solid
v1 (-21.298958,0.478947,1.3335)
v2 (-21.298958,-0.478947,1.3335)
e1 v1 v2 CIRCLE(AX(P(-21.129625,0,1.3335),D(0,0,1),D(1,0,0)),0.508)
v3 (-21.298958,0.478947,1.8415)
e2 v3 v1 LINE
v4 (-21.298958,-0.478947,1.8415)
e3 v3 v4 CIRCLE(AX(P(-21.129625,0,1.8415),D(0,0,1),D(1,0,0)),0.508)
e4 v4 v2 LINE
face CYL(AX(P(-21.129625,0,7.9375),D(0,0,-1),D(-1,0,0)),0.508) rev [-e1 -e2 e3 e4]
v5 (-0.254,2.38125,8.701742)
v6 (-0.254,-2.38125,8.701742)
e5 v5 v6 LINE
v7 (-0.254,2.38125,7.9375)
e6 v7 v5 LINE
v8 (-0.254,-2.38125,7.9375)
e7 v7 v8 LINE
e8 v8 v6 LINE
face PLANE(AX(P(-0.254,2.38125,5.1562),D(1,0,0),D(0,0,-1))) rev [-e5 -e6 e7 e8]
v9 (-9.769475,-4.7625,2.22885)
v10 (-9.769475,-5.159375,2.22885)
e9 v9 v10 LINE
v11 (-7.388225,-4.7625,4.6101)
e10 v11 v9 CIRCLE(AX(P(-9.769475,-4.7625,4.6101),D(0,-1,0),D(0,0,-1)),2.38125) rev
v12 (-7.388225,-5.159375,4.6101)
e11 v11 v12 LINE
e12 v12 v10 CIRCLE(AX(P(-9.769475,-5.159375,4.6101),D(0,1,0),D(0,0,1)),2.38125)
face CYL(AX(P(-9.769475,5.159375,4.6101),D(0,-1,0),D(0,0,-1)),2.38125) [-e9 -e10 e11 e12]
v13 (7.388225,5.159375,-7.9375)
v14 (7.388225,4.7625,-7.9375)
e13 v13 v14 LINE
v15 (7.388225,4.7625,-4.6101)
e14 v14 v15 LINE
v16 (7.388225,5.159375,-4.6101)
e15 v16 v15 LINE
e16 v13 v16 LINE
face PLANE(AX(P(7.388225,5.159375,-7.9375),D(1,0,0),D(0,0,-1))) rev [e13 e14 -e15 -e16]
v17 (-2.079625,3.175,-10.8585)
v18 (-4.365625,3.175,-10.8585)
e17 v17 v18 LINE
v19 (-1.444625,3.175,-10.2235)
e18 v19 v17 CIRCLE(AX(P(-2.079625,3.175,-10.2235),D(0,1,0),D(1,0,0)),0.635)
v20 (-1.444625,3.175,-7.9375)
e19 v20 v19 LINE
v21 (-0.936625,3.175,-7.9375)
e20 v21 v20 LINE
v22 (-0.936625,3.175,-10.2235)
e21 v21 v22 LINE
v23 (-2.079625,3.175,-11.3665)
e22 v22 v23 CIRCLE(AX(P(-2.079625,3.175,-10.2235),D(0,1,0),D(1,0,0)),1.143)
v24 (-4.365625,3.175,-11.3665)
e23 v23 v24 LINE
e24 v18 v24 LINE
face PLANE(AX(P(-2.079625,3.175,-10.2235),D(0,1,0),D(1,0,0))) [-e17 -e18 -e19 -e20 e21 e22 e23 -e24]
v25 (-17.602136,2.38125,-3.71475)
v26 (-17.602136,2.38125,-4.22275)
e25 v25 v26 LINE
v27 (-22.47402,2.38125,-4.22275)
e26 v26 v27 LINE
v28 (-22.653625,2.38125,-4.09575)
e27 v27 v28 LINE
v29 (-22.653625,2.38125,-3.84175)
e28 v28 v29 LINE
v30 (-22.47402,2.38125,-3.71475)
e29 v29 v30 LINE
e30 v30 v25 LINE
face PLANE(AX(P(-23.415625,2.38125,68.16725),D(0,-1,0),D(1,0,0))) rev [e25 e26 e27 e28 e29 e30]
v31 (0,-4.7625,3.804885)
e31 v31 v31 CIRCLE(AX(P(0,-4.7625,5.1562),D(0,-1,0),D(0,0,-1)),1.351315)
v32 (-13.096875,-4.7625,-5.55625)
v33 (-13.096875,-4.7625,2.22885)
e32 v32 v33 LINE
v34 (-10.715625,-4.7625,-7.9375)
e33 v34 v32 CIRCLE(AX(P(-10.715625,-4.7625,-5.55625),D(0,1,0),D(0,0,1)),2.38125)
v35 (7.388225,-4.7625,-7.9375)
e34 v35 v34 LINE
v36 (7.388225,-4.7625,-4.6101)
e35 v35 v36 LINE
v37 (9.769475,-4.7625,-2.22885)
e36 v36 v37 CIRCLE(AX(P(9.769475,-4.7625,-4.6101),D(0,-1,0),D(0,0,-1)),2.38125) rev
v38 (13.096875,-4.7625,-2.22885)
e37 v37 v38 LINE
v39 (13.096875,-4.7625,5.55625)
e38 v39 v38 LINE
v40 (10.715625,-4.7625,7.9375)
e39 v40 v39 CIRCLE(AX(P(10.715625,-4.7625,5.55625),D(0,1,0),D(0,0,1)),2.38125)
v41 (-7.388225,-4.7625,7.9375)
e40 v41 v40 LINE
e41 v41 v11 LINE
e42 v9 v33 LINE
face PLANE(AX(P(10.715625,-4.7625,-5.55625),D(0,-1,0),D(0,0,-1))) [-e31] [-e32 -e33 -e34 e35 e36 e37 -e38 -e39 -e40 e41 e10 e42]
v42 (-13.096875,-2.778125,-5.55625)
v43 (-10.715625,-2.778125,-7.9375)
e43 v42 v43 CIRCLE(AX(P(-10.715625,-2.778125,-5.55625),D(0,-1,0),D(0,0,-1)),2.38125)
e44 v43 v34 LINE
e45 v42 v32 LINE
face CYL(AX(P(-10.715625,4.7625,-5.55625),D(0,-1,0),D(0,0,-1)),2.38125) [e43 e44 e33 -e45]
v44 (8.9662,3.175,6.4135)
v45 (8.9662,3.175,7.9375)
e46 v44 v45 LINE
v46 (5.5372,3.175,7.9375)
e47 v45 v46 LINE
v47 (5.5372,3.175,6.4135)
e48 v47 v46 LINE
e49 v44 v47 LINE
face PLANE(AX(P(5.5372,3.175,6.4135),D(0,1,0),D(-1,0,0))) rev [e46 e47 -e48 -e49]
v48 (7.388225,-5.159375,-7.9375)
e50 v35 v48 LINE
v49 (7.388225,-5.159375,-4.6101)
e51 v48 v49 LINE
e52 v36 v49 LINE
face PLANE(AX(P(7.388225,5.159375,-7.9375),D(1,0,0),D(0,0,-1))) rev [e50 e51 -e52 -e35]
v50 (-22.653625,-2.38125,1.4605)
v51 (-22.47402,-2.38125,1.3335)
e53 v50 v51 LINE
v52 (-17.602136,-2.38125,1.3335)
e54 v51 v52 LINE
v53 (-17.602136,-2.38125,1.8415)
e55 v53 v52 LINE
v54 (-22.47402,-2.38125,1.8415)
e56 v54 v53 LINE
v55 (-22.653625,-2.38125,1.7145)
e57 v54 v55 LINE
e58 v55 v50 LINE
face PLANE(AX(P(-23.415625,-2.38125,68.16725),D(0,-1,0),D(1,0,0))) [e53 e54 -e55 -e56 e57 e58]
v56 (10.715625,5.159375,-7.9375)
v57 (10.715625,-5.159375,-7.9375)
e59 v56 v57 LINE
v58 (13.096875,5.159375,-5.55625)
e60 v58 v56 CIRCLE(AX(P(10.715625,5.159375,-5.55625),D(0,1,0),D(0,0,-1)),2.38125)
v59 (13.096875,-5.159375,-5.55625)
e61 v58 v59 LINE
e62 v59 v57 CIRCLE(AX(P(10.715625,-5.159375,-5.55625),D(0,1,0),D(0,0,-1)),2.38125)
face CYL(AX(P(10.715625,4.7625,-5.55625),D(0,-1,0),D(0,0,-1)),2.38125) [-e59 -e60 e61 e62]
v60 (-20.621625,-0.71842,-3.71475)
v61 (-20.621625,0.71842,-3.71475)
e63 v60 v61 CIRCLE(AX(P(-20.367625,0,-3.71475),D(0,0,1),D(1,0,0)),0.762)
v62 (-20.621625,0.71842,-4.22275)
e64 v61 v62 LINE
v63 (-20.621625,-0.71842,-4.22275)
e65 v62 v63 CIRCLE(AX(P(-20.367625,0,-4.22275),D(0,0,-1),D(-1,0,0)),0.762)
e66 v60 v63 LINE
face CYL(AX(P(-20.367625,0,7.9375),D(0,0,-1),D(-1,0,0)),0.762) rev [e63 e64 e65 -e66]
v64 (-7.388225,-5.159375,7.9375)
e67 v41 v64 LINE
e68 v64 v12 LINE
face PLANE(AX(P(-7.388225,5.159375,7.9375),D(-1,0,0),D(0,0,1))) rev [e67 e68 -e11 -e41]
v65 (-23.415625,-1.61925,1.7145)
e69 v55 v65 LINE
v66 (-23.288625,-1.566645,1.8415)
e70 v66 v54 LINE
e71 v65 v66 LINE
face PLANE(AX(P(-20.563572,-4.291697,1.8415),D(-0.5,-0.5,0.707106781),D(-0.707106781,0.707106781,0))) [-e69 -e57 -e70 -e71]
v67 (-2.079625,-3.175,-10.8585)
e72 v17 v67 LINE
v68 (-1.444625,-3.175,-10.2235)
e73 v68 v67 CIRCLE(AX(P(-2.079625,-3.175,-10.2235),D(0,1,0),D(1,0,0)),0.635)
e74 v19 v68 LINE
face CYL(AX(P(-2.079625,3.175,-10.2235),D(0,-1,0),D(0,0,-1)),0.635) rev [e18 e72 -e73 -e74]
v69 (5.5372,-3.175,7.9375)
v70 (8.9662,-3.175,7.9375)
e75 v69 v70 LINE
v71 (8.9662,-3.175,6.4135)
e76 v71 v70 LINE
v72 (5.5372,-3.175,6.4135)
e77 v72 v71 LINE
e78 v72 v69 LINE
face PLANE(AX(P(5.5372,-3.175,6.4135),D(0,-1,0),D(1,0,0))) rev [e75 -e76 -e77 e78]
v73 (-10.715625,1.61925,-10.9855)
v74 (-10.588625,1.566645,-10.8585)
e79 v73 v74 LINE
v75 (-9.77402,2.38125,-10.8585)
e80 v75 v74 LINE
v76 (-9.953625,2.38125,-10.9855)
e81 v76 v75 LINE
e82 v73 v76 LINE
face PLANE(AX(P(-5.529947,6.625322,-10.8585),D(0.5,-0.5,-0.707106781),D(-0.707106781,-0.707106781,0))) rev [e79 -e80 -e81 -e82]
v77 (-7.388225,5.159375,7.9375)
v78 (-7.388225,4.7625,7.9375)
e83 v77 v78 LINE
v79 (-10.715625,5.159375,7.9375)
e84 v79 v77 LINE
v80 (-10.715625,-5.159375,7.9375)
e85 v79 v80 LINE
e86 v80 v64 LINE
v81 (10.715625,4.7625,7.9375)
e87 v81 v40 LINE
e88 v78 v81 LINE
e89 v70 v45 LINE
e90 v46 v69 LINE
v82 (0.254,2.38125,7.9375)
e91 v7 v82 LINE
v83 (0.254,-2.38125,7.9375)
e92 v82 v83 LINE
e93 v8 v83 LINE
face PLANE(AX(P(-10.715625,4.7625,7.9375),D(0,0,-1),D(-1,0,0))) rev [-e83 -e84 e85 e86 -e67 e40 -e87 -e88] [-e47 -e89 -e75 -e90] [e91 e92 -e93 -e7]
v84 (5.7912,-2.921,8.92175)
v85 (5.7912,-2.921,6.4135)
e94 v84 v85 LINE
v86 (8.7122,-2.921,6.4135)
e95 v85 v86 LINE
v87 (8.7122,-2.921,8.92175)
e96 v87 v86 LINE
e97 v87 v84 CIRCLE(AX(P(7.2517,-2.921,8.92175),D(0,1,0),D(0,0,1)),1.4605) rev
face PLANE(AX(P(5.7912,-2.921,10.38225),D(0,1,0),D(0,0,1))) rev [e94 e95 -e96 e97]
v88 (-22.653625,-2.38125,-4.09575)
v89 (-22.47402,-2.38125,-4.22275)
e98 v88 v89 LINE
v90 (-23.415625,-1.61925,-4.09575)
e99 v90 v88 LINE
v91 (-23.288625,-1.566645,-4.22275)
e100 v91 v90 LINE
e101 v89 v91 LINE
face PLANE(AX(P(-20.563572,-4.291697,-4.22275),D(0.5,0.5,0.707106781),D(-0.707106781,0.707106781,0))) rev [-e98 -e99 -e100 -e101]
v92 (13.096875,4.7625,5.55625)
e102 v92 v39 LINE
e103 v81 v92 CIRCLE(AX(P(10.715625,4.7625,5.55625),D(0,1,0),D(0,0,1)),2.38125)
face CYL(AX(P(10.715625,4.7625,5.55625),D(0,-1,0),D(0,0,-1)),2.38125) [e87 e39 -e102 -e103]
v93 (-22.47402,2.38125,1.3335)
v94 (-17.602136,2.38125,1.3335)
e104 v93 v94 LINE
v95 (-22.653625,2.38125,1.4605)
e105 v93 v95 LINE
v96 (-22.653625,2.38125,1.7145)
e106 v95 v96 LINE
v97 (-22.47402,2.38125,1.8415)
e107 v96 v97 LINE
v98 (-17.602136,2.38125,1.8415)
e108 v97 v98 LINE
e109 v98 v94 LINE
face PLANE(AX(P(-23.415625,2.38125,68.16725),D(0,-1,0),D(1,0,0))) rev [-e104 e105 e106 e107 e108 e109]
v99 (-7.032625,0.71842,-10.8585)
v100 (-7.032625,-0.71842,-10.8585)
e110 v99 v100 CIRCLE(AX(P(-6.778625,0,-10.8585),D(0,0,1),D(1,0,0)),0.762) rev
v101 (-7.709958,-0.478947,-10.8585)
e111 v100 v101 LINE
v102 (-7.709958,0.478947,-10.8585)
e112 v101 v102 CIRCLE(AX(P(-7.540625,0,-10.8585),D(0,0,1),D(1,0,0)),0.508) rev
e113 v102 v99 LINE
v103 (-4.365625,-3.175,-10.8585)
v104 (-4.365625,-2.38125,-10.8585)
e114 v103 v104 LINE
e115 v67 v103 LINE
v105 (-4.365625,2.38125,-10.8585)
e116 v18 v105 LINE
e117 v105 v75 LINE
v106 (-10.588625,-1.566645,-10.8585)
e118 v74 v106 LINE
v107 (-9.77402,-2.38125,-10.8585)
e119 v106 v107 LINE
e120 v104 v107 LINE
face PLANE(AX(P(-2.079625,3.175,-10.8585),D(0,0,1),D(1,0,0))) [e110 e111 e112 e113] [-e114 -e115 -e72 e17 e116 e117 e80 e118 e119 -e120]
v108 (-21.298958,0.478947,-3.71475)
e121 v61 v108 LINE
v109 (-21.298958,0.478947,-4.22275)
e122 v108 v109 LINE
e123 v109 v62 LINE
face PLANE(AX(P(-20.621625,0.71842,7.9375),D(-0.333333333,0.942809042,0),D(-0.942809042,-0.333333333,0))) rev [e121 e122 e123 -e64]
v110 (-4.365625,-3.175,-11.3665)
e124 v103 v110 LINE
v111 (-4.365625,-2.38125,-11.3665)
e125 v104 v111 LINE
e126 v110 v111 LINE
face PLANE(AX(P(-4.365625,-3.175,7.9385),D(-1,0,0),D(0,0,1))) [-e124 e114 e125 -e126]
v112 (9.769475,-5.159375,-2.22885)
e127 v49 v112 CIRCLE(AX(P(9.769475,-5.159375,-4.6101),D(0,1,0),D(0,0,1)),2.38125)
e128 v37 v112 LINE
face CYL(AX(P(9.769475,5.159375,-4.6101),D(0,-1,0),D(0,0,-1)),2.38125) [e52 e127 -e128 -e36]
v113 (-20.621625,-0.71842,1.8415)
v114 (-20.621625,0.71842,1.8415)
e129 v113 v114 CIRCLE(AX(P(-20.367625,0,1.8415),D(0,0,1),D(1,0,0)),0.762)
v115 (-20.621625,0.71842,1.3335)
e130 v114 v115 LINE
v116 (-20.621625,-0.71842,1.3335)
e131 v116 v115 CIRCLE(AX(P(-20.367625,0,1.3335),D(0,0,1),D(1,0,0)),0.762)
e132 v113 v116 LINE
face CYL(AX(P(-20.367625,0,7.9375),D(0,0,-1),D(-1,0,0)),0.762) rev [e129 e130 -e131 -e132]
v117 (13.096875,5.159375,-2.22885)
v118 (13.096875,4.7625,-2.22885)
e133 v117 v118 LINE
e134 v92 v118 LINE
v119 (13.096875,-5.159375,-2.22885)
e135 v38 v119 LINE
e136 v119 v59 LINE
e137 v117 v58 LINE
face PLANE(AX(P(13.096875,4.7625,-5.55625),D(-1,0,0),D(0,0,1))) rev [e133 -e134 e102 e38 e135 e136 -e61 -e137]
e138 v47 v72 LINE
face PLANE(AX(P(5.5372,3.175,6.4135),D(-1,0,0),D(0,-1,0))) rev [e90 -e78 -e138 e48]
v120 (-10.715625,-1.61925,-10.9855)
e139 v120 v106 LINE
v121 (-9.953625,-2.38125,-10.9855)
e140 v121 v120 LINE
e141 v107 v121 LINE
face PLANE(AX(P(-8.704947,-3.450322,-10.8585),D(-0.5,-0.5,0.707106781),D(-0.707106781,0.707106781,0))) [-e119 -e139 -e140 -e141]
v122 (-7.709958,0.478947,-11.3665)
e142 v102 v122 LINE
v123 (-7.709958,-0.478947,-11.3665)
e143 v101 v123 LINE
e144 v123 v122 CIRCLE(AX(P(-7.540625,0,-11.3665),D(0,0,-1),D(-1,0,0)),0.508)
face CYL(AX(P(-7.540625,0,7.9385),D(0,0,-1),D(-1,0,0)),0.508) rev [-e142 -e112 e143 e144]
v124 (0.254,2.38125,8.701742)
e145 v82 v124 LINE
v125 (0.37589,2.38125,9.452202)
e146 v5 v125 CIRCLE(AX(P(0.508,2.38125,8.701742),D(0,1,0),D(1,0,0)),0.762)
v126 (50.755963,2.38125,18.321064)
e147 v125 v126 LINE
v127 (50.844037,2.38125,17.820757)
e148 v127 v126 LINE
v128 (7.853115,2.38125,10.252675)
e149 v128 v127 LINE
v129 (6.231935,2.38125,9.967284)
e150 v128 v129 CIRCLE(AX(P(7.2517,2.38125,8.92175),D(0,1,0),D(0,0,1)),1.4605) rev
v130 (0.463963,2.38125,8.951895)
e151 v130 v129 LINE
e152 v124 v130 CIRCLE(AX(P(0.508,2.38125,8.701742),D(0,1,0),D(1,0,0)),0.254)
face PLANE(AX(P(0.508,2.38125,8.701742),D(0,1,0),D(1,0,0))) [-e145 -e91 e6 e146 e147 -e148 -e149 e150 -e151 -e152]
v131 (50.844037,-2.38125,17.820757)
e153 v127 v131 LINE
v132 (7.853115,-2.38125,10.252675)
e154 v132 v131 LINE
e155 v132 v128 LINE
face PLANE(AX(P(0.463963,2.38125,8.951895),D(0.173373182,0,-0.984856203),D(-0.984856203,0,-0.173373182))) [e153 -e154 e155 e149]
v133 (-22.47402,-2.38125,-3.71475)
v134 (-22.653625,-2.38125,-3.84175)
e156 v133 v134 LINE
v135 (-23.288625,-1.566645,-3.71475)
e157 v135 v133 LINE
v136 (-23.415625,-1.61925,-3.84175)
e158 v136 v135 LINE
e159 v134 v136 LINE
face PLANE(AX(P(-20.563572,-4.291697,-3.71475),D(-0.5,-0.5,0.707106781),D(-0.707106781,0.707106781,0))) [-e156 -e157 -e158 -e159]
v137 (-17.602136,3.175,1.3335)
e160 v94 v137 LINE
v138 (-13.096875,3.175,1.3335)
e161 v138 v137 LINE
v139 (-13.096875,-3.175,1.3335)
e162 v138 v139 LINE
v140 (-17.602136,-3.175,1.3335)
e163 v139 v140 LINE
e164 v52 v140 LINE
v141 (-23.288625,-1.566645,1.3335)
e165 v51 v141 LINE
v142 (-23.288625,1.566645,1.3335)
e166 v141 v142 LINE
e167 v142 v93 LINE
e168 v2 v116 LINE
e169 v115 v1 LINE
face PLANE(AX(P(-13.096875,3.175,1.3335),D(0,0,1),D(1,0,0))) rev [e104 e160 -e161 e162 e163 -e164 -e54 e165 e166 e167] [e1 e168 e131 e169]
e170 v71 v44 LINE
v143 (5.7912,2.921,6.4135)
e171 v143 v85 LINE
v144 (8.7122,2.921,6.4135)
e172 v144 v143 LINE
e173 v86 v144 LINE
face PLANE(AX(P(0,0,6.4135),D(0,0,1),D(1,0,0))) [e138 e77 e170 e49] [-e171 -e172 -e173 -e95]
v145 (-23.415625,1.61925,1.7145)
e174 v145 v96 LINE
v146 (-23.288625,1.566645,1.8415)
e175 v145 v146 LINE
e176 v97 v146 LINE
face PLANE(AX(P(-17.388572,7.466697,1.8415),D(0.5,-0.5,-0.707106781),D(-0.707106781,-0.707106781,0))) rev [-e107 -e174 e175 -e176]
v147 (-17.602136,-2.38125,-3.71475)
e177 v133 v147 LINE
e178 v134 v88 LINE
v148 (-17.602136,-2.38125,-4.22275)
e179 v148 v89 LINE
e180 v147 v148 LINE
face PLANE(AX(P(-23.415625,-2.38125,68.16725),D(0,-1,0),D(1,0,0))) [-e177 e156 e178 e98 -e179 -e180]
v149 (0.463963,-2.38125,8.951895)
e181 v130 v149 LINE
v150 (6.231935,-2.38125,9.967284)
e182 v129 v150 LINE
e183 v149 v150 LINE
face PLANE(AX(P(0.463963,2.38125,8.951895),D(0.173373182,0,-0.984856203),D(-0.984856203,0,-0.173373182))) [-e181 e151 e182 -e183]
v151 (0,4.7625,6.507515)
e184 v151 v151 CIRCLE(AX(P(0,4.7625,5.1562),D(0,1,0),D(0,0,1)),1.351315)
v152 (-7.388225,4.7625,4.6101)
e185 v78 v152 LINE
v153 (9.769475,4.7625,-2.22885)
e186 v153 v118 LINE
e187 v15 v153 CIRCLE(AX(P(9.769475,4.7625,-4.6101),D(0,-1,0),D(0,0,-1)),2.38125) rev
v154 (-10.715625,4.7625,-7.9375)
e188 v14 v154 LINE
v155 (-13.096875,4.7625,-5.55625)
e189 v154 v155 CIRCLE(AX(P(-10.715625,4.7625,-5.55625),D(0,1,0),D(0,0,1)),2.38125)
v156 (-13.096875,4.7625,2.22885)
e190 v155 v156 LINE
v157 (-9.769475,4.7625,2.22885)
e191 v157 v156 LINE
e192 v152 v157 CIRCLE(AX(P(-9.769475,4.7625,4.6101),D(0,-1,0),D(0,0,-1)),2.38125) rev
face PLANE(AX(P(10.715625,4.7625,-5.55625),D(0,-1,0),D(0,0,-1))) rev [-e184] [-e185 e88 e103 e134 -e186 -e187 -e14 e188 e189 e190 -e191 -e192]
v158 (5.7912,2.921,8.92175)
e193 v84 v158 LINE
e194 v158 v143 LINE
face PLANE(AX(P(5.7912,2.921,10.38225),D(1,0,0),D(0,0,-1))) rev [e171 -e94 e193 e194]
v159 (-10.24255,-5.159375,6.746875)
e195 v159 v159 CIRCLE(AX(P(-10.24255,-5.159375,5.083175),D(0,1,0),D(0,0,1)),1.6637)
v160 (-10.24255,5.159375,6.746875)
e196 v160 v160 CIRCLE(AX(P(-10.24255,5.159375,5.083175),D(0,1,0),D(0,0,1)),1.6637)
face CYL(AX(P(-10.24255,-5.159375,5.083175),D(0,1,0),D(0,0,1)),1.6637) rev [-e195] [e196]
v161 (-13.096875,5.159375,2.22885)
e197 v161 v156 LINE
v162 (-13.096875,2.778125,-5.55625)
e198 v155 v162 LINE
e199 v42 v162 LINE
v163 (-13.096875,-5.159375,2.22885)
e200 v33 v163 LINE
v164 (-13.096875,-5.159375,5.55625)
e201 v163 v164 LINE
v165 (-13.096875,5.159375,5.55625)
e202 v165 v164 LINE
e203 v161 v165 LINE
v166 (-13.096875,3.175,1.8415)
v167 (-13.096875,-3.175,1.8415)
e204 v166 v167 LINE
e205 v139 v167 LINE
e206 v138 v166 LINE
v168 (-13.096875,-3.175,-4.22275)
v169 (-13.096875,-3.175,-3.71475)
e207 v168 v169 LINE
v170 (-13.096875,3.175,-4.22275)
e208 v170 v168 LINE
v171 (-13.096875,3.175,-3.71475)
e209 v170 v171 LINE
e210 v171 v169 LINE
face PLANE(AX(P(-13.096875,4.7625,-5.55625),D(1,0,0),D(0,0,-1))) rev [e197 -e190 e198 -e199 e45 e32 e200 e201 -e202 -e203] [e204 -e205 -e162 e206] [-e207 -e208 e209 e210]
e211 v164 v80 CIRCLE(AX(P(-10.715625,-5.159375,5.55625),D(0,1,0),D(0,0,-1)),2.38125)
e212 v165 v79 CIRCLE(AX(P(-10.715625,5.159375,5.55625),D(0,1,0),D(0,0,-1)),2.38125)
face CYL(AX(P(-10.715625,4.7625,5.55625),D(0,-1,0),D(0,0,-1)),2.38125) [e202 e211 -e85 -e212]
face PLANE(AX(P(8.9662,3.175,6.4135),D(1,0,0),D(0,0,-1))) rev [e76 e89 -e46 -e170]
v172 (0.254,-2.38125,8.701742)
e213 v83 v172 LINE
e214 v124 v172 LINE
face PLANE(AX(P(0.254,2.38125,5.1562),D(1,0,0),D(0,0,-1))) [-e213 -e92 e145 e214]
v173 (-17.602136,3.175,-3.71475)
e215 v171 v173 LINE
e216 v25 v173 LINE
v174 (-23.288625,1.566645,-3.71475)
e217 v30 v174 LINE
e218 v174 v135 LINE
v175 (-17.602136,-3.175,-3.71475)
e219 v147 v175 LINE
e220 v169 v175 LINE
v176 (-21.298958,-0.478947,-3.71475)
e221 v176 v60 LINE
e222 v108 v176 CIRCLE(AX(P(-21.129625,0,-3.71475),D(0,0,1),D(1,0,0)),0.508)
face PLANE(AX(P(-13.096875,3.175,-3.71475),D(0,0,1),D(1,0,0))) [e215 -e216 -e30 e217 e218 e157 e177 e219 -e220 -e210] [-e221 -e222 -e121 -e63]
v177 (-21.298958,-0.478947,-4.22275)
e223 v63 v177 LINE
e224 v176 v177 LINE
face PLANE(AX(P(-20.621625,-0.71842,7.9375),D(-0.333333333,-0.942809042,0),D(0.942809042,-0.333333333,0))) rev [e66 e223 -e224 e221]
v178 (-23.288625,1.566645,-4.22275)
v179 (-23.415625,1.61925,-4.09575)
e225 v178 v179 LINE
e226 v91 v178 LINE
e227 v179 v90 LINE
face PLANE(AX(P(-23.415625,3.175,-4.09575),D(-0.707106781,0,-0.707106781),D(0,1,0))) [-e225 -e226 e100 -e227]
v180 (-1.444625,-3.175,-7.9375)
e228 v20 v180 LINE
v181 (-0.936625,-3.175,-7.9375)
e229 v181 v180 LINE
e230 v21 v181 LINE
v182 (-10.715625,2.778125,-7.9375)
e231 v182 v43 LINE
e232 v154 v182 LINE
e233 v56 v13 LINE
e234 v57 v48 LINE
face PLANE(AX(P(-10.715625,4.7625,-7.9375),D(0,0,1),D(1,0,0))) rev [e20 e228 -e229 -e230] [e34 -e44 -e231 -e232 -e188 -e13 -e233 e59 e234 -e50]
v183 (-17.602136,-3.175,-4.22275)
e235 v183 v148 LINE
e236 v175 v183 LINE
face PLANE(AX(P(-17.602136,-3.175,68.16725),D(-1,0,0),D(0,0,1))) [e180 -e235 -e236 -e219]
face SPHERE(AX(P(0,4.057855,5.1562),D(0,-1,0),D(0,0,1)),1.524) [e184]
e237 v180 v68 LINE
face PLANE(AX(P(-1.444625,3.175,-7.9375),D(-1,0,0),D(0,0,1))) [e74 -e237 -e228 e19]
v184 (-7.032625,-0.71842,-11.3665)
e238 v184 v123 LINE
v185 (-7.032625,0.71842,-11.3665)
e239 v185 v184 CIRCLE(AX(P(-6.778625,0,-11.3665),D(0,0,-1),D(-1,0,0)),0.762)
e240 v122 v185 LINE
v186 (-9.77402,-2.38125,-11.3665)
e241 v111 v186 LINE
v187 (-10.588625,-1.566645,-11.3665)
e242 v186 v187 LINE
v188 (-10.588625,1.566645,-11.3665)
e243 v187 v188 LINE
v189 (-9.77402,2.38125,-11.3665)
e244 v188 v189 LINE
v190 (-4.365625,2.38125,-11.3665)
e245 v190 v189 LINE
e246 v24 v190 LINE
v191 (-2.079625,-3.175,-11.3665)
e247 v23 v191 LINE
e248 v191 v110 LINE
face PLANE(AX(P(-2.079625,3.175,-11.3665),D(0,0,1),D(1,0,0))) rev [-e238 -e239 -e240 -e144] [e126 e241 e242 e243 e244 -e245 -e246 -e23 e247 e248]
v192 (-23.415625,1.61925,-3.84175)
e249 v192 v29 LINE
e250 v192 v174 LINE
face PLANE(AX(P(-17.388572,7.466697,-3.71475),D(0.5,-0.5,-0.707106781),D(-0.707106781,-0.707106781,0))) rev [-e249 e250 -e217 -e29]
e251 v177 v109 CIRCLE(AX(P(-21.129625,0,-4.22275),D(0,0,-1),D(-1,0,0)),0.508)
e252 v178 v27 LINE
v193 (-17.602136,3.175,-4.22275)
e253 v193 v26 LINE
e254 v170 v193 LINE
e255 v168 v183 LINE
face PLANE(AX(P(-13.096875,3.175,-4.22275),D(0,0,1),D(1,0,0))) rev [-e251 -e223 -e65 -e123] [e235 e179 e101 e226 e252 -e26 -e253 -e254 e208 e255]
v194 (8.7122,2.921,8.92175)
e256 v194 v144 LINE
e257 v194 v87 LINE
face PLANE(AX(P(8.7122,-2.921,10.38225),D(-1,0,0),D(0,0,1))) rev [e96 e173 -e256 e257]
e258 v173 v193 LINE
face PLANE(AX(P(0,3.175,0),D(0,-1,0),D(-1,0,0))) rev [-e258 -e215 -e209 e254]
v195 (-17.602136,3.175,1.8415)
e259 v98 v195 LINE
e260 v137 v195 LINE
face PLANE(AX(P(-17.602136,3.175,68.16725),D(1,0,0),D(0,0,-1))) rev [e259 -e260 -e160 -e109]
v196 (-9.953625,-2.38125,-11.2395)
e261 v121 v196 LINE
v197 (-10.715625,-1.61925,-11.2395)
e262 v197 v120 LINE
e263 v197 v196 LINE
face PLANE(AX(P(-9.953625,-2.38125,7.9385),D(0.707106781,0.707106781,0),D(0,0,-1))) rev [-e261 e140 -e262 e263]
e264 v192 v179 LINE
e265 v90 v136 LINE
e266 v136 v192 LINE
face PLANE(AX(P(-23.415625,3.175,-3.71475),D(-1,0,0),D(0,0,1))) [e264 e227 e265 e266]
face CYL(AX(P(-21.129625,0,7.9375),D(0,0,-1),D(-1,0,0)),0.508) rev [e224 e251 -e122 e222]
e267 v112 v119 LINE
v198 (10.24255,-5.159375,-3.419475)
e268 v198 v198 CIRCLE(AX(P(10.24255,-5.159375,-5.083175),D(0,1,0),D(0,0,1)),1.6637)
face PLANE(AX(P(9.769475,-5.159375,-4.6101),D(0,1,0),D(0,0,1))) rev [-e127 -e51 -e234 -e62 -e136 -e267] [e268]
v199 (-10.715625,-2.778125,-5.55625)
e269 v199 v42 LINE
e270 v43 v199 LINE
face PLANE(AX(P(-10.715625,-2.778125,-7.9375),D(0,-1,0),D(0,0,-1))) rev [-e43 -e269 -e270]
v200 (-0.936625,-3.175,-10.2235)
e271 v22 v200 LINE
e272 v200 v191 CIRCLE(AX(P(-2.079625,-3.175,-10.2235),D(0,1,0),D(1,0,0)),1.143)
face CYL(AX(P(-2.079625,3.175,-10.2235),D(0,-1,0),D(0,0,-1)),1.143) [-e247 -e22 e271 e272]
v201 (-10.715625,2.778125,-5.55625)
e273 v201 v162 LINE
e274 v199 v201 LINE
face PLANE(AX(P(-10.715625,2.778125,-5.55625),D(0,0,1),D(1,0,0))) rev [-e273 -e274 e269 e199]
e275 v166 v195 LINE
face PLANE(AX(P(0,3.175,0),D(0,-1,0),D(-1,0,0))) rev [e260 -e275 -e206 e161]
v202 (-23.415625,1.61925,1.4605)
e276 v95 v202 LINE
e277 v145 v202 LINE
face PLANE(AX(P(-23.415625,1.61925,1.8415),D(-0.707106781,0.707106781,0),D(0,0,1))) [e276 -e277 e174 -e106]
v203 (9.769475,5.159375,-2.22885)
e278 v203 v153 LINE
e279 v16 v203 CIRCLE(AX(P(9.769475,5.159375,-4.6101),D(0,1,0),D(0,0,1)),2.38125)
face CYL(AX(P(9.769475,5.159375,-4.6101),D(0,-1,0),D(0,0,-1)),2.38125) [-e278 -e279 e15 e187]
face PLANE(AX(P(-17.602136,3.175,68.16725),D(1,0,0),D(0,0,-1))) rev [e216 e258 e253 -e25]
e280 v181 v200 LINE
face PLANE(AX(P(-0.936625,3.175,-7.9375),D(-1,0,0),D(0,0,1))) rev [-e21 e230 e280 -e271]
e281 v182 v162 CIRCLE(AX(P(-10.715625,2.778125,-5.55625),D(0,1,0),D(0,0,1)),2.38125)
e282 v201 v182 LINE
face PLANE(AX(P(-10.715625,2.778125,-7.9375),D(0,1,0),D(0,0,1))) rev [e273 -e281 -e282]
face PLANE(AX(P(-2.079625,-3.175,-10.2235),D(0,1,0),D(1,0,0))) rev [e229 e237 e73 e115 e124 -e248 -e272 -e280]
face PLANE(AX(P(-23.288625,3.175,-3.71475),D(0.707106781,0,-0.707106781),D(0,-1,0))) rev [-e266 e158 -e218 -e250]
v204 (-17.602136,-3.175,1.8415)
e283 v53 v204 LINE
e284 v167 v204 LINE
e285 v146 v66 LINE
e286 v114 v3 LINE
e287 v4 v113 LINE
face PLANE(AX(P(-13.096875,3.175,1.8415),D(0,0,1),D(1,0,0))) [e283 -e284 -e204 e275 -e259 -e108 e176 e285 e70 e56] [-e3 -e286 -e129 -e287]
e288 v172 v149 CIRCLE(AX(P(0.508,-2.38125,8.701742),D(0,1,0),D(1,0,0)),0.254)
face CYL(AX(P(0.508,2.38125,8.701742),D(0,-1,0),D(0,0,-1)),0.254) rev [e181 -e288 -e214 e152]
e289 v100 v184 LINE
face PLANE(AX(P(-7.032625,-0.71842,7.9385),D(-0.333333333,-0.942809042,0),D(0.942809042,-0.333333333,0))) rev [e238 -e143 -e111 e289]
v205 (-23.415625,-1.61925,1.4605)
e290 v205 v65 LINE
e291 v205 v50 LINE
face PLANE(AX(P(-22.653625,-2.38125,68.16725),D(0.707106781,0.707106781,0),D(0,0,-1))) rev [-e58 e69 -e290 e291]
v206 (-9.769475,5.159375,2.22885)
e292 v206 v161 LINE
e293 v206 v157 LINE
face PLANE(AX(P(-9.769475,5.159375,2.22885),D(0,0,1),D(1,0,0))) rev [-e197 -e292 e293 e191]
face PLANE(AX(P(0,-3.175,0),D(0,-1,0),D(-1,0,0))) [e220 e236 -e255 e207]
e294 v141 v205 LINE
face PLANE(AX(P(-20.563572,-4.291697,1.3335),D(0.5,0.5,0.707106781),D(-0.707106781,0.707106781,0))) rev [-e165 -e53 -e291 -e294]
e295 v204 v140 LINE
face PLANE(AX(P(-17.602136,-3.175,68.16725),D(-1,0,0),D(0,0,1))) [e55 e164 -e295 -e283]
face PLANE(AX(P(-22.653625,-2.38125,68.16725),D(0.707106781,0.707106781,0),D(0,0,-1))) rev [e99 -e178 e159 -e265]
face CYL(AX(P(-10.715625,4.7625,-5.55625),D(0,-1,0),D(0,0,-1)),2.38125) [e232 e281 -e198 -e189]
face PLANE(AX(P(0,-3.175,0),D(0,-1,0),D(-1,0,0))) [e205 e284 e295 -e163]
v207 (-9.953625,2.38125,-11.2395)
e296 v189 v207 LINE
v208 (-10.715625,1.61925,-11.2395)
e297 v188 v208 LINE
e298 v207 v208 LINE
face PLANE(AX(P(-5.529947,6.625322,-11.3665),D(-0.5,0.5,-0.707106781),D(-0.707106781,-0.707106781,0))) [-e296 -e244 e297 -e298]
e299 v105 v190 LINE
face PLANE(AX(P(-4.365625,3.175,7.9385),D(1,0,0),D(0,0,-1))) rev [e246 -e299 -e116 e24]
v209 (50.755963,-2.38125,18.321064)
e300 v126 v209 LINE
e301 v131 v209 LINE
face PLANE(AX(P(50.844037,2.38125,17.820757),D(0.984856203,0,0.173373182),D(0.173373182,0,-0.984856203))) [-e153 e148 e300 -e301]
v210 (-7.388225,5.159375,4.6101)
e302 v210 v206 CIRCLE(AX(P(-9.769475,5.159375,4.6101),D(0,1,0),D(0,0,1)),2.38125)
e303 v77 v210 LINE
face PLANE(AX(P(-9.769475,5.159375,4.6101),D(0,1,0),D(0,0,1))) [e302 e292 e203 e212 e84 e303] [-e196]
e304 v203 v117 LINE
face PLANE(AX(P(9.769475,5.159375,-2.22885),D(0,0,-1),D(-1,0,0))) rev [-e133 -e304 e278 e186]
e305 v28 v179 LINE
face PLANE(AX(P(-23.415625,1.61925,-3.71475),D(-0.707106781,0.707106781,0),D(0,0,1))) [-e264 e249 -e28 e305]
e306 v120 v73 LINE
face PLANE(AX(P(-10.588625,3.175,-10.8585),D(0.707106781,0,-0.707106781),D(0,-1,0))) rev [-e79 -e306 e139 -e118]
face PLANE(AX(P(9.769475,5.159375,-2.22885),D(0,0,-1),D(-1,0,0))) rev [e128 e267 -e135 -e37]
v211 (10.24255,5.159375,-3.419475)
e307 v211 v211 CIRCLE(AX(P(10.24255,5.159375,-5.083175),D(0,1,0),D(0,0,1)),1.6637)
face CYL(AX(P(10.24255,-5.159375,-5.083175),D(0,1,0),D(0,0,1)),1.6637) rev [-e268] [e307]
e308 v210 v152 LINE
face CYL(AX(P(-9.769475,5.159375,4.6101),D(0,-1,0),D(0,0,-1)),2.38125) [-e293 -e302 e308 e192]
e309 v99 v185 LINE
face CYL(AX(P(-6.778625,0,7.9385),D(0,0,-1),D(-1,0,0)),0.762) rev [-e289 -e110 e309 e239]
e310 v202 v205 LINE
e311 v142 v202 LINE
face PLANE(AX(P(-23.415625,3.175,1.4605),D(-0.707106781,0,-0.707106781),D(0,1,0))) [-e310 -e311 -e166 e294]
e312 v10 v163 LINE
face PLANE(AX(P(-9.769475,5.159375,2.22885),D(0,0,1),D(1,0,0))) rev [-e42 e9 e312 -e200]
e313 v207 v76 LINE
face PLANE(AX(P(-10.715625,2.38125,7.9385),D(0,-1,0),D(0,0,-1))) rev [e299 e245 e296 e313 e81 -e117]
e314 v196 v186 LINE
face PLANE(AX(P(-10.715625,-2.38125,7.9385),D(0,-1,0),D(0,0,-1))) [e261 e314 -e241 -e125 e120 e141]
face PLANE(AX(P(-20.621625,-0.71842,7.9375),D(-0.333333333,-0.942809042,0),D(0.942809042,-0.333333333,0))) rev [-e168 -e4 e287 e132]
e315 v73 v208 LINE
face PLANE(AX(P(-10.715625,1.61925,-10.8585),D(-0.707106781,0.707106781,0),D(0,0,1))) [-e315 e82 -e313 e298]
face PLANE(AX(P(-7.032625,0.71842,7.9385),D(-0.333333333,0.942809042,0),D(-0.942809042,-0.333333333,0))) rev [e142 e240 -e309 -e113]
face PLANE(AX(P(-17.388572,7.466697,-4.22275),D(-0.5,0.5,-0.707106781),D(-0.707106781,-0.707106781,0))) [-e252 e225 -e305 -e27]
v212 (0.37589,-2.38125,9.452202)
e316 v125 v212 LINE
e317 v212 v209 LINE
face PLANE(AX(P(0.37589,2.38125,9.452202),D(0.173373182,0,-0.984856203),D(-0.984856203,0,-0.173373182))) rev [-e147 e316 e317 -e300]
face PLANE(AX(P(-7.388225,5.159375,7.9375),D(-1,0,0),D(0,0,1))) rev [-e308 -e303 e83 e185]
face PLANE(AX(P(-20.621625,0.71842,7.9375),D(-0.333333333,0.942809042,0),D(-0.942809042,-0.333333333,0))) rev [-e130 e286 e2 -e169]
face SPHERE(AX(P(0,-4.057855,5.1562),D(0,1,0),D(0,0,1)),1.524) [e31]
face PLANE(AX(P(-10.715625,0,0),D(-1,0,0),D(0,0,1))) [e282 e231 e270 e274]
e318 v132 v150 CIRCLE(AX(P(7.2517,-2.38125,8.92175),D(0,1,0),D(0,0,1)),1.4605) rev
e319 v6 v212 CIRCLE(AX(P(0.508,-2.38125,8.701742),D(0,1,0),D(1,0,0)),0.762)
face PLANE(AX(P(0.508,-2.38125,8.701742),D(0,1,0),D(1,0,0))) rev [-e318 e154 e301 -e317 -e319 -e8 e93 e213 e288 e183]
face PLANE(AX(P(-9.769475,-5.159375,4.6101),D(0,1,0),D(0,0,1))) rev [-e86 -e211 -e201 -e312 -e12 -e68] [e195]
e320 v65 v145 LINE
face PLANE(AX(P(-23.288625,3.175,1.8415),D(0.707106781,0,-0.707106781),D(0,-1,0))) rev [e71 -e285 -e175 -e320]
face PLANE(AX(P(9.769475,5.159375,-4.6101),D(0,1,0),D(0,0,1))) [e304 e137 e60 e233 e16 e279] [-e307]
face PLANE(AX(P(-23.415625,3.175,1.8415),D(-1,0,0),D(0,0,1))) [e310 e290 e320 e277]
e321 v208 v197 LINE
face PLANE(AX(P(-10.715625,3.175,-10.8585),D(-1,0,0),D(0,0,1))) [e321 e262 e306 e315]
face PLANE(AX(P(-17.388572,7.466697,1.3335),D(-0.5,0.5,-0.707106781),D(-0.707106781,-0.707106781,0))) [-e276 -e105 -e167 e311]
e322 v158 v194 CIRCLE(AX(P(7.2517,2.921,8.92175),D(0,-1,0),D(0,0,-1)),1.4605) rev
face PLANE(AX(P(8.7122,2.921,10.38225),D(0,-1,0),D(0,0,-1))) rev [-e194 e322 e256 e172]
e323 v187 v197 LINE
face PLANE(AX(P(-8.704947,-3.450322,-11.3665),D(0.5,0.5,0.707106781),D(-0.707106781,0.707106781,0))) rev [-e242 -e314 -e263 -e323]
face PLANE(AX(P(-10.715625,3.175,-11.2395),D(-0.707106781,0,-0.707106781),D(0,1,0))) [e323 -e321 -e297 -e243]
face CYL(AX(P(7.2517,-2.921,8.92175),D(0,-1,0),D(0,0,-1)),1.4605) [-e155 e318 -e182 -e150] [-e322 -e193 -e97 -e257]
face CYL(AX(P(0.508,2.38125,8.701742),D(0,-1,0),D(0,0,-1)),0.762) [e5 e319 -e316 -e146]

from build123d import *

# Parameters (mm, degrees)
BOSS_EXTRUDE1_DEPTH = 4.7625
BOSS_EXTRUDE2_DEPTH = 5.159375
BOSS_EXTRUDE3_DEPTH = 5.159375
SKETCH4_R           = 1.6637
CUT_EXTRUDE1_DEPTH  = 19.466419322
SKETCH5_W           = 2.38125
SKETCH5_H           = 5.55625
CUT_EXTRUDE2_DEPTH  = 2.38125
EXTRUDE_THIN1_DEPTH = 3.175
CUT_EXTRUDE3_REACH  = 25.891
SKETCH7_W           = 6.35
SKETCH7_H           = 0.79375
SKETCH8_W           = 10.31875
SKETCH8_H           = 0.508
EXTRUDE_THIN2_DEPTH = 3.175
SKETCH9_W           = 5.813488842
SKETCH9_H           = 0.79375
CUT_EXTRUDE4_DEPTH  = 72.39
CUT_EXTRUDE5_REACH  = 32.782
CUT_EXTRUDE6_DEPTH  = 27.884611297
CHAMFER1_SIZE       = 0.762
CHAMFER2_SIZE       = 0.127
SKETCH12_W          = 3.429
SKETCH12_H          = 6.35
CUT_EXTRUDE7_DEPTH  = 1.524
SKETCH13_W          = 2.921
SKETCH13_H          = 5.842
BOSS_EXTRUDE4_DEPTH = 3.96875
FILLET1_RADIUS      = 1.4605
FILLET1_LENGTH      = 5.842
EXTRUDE_THIN5_START = -2.38125
EXTRUDE_THIN5_DEPTH = 4.7625


# Read off the part's stored shape, not the designer's step: Extrude-Thin5
with BuildPart() as part:
    # Sketch1 → Boss-Extrude1 (new, symmetric)
    with BuildSketch(Plane(origin=(0, 0, 0), x_dir=(1, 0, 0), z_dir=(0, 1, 0))):
        with BuildLine():
            Line((-10.715625, 7.9375), (10.715625, 7.9375))
            ThreePointArc((10.715625, 7.9375), (12.399423023, 7.240048023), (13.096875, 5.55625))
            Line((13.096875, 5.55625), (13.096875, -5.55625))
            ThreePointArc((13.096875, -5.55625), (12.399423023, -7.240048023), (10.715625, -7.9375))
            Line((10.715625, -7.9375), (-10.715625, -7.9375))
            ThreePointArc((-10.715625, -7.9375), (-12.399423023, -7.240048023), (-13.096875, -5.55625))
            Line((-13.096875, -5.55625), (-13.096875, 5.55625))
            ThreePointArc((-13.096875, 5.55625), (-12.399423023, 7.240048023), (-10.715625, 7.9375))
        make_face()
    extrude(amount=BOSS_EXTRUDE1_DEPTH, both=True)

    # Sketch2 → Boss-Extrude2 (add, symmetric)
    with BuildSketch(Plane(origin=(0, 0, 0), x_dir=(1, 0, 0), z_dir=(0, 1, 0))):
        with BuildLine():
            Line((7.388225, 7.9375), (10.715625, 7.9375))
            ThreePointArc((10.715625, 7.9375), (12.399423023, 7.240048023), (13.096875, 5.55625))
            Line((13.096875, 5.55625), (13.096875, 2.22885))
            Line((13.096875, 2.22885), (9.769475, 2.22885))
            ThreePointArc((9.769475, 2.22885), (8.085676977, 2.926301977), (7.388225, 4.6101))
            Line((7.388225, 4.6101), (7.388225, 7.9375))
        make_face()
    extrude(amount=BOSS_EXTRUDE2_DEPTH, both=True)

    # Sketch3 → Boss-Extrude3 (add, symmetric)
    with BuildSketch(Plane(origin=(0, 0, 0), x_dir=(1, 0, 0), z_dir=(0, 1, 0))):
        with BuildLine():
            Line((-7.388225, -7.9375), (-10.715625, -7.9375))
            ThreePointArc((-10.715625, -7.9375), (-12.399423023, -7.240048023), (-13.096875, -5.55625))
            Line((-13.096875, -5.55625), (-13.096875, -2.22885))
            Line((-13.096875, -2.22885), (-9.769475, -2.22885))
            ThreePointArc((-9.769475, -2.22885), (-8.085676977, -2.926301977), (-7.388225, -4.6101))
            Line((-7.388225, -4.6101), (-7.388225, -7.9375))
        make_face()
    extrude(amount=BOSS_EXTRUDE3_DEPTH, both=True)

    # Sketch4 → Cut-Extrude1 (cut, through all)
    with BuildSketch(Plane(origin=(0, 5.159375, 0), x_dir=(1, 0, 0), z_dir=(0, 1, 0))):
        with Locations(Location((-10.24255, -5.083175, 0), (0, 0, 270))):
            Circle(SKETCH4_R)
        with Locations(Location((10.24255, 5.083175, 0), (0, 0, 270))):
            Circle(SKETCH4_R)
    extrude(amount=-CUT_EXTRUDE1_DEPTH, mode=Mode.SUBTRACT)

    # Sketch5 → Cut-Extrude2 (cut)
    with BuildSketch(Plane.ZY.offset(13.096875)):
        with Locations((-6.746875, 0)):
            Rectangle(SKETCH5_W, SKETCH5_H)
    extrude(amount=-CUT_EXTRUDE2_DEPTH, mode=Mode.SUBTRACT)

    # Sketch6 → Extrude-Thin1 (add, symmetric)
    with BuildSketch(Plane(origin=(0, 0, 0), x_dir=(1, 0, 0), z_dir=(0, 1, 0))):
        with BuildLine():
            Line((-0.936625, 7.9375), (-0.936625, 10.2235))
            ThreePointArc((-0.936625, 10.2235), (-1.271401949, 11.031723051), (-2.079625, 11.3665))
            Line((-2.079625, 11.3665), (-10.715625, 11.3665))
            Line((-10.715625, 11.3665), (-10.715625, 10.8585))
            Line((-10.715625, 10.8585), (-2.079625, 10.8585))
            ThreePointArc((-2.079625, 10.8585), (-1.630612194, 10.672512806), (-1.444625, 10.2235))
            Line((-1.444625, 10.2235), (-1.444625, 7.9375))
            Line((-1.444625, 7.9375), (-0.936625, 7.9375))
        make_face()
    extrude(amount=EXTRUDE_THIN1_DEPTH, both=True)

    # Sketch7 → Cut-Extrude3 (cut, up to next)
    with BuildSketch(Plane(origin=(0, 0, -11.3665), x_dir=(-1, 0, 0), z_dir=(0, 0, -1)), mode=Mode.PRIVATE) as cut_extrude3_sk1:
        with Locations((7.540625, 2.778125)):
            Rectangle(SKETCH7_W, SKETCH7_H)
    cut_extrude3_tool1 = extrude(cut_extrude3_sk1.sketch, amount=-CUT_EXTRUDE3_REACH, mode=Mode.PRIVATE) & part.part
    cut_extrude3 = cut_extrude3_tool1.solids().sort_by_distance((-7.540625, 2.778125, -11.3665))[0]
    add(cut_extrude3, mode=Mode.SUBTRACT)

    # Sketch8 → Extrude-Thin2 (add, symmetric)
    with BuildSketch(Plane(origin=(0, 0, 0), x_dir=(1, 0, 0), z_dir=(0, 1, 0))):
        with Locations((-18.25625, 3.96875)):
            Rectangle(SKETCH8_W, SKETCH8_H)
        with Locations((-18.25625, -1.5875)):
            Rectangle(SKETCH8_W, SKETCH8_H)
    extrude(amount=EXTRUDE_THIN2_DEPTH, both=True)

    # Sketch9 → Cut-Extrude4 (cut)
    with BuildSketch(Plane(origin=(0, 0, -4.22275), x_dir=(-1, 0, 0), z_dir=(0, 0, -1))):
        with Locations((20.508880579, 2.778125)):
            Rectangle(SKETCH9_W, SKETCH9_H)
    cut_extrude4 = extrude(amount=-CUT_EXTRUDE4_DEPTH, mode=Mode.SUBTRACT)

    # Mirror1: Cut-Extrude3, Cut-Extrude4 across plane
    add(cut_extrude3.mirror(Plane.ZX), mode=Mode.SUBTRACT)
    add(cut_extrude4.mirror(Plane.ZX), mode=Mode.SUBTRACT)

    # Sketch10 → Cut-Extrude5 (cut, up to next)
    with BuildSketch(Plane(origin=(0, 0, -11.3665), x_dir=(-1, 0, 0), z_dir=(0, 0, -1)), mode=Mode.PRIVATE) as cut_extrude5_sk1:
        with BuildLine():
            Line((7.032625, 0.71842049), (7.709958333, 0.478946993))
            ThreePointArc((7.709958333, 0.478946993), (8.048625, 0), (7.709958333, -0.478946993))
            Line((7.709958333, -0.478946993), (7.032625, -0.71842049))
            ThreePointArc((7.032625, -0.71842049), (6.016625, 0), (7.032625, 0.71842049))
        make_face()
    cut_extrude5_tool1 = extrude(cut_extrude5_sk1.sketch, amount=-CUT_EXTRUDE5_REACH, mode=Mode.PRIVATE) & part.part
    add(cut_extrude5_tool1.solids().sort_by_distance((-6.978953, 0, -11.3665))[0], mode=Mode.SUBTRACT)

    # Sketch11 → Cut-Extrude6 (cut, through all)
    with BuildSketch(Plane(origin=(0, 0, -4.22275), x_dir=(-1, 0, 0), z_dir=(0, 0, -1))):
        with BuildLine():
            Line((20.621625, 0.71842049), (21.298958333, 0.478946993))
            ThreePointArc((21.298958333, 0.478946993), (21.637625, 0), (21.298958333, -0.478946993))
            Line((21.298958333, -0.478946993), (20.621625, -0.71842049))
            ThreePointArc((20.621625, -0.71842049), (19.605625, 0), (20.621625, 0.71842049))
        make_face()
    extrude(amount=-CUT_EXTRUDE6_DEPTH, mode=Mode.SUBTRACT)

    # Chamfer1
    chamfer1_edges = [part.edges().sort_by_distance(p)[0] for p in [
        (-10.715625, 2.38125, -11.1125),
        (-23.415625, 2.38125, 1.5875),
        (-23.415625, 2.38125, -3.96875),
        (-10.715625, -2.38125, -11.1125),
        (-23.415625, -2.38125, 1.5875),
        (-23.415625, -2.38125, -3.96875),
    ]]
    chamfer(chamfer1_edges, length=CHAMFER1_SIZE)

    # Chamfer2
    chamfer2_edges = [part.edges().sort_by_distance(p)[0] for p in [
        (-10.715625, 0, -11.3665),
        (-10.715625, 0, -10.8585),
        (-10.334625, -2.00025, -11.3665),
        (-10.334625, 2.00025, -11.3665),
        (-10.334625, -2.00025, -10.8585),
        (-10.334625, 2.00025, -10.8585),
        (-23.415625, 0, 1.3335),
        (-23.034625, 2.00025, 1.3335),
        (-23.034625, -2.00025, 1.3335),
        (-23.415625, 0, 1.8415),
        (-23.034625, 2.00025, 1.8415),
        (-23.034625, -2.00025, 1.8415),
        (-23.415625, 0, -4.22275),
        (-23.415625, 0, -3.71475),
        (-23.034625, -2.00025, -4.22275),
        (-23.034625, 2.00025, -4.22275),
        (-23.034625, -2.00025, -3.71475),
        (-23.034625, 2.00025, -3.71475),
    ]]
    chamfer(chamfer2_edges, length=CHAMFER2_SIZE)

    # Sketch12 → Cut-Extrude7 (cut)
    with BuildSketch(Plane.XY.offset(7.9375)):
        with Locations((7.2517, 0)):
            Rectangle(SKETCH12_W, SKETCH12_H)
    extrude(amount=-CUT_EXTRUDE7_DEPTH, mode=Mode.SUBTRACT)

    # Sketch13 → Boss-Extrude4 (add)
    with BuildSketch(Plane.XY.offset(6.4135)):
        with Locations((7.2517, 0)):
            Rectangle(SKETCH13_W, SKETCH13_H)
    extrude(amount=BOSS_EXTRUDE4_DEPTH)

    # Fillet1: full round fillet: the end face becomes a half cylinder, R = half its width
    fillet1_face = Plane((7.2517, 0, 10.38225), x_dir=(0, -1, 0), z_dir=(0, 0, 1))  # on the end face: x along it, z out of the body
    fillet1_slab = fillet1_face.offset(-FILLET1_RADIUS / 2) * Box(FILLET1_LENGTH, 2 * FILLET1_RADIUS, FILLET1_RADIUS, mode=Mode.PRIVATE)  # the body's end, R deep
    fillet1_round = Plane((7.2517, 0, 8.92175), x_dir=(0, 0, 1), z_dir=(0, -1, 0)) * Cylinder(FILLET1_RADIUS, FILLET1_LENGTH, mode=Mode.PRIVATE)  # its axis R under the face
    add(fillet1_slab - fillet1_round, mode=Mode.SUBTRACT)

    # Sketch14 → Revolve1 (revolve)
    with BuildSketch(Plane(origin=(0, 0, 0), x_dir=(0, 0, -1), z_dir=(1, 0, 0))):
        with BuildLine():
            Line((-5.1562, -4.7625), (-5.1562, -5.581854839))
            ThreePointArc((-5.1562, -5.581854839), (-5.946357191, -5.361015463), (-6.507514618, -4.7625))
            Line((-6.507514618, -4.7625), (-5.1562, -4.7625))
        make_face()
    revolve1 = revolve(axis=Axis((0, -4.7625, 5.1562), (0, -1, 0)))

    # Mirror2: Revolve1 across plane
    add(revolve1.mirror(Plane.ZX))

    # Extrude-Thin5 outline → Extrude-Thin5 (add)
    with BuildSketch(Plane(origin=(0, 0, 0), x_dir=(1, 0, 0), z_dir=(0, 1, 0)).offset(EXTRUDE_THIN5_START)):
        with BuildLine():
            Line((50.755963212, -18.321063831), (50.844036788, -17.82075688))
            Line((50.844036788, -17.82075688), (7.853115161, -10.252674511))
            ThreePointArc((7.853115161, -10.252674511), (6.998488468, -10.360132484), (6.231935352, -9.967283506))
            Line((6.231935352, -9.967283506), (0.463963212, -8.951894987))
            ThreePointArc((0.463963212, -8.951894987), (0.313447508, -8.865036728), (0.254, -8.701741511))
            Line((0.254, -8.701741511), (0.254, -7.9375))
            Line((0.254, -7.9375), (-0.254, -7.9375))
            Line((-0.254, -7.9375), (-0.254, -8.701741511))
            ThreePointArc((-0.254, -8.701741511), (-0.075657476, -9.191627163), (0.375889636, -9.452201938))
            Line((0.375889636, -9.452201938), (50.755963212, -18.321063831))
        make_face()
    extrude(amount=EXTRUDE_THIN5_DEPTH)


solid = part.part
